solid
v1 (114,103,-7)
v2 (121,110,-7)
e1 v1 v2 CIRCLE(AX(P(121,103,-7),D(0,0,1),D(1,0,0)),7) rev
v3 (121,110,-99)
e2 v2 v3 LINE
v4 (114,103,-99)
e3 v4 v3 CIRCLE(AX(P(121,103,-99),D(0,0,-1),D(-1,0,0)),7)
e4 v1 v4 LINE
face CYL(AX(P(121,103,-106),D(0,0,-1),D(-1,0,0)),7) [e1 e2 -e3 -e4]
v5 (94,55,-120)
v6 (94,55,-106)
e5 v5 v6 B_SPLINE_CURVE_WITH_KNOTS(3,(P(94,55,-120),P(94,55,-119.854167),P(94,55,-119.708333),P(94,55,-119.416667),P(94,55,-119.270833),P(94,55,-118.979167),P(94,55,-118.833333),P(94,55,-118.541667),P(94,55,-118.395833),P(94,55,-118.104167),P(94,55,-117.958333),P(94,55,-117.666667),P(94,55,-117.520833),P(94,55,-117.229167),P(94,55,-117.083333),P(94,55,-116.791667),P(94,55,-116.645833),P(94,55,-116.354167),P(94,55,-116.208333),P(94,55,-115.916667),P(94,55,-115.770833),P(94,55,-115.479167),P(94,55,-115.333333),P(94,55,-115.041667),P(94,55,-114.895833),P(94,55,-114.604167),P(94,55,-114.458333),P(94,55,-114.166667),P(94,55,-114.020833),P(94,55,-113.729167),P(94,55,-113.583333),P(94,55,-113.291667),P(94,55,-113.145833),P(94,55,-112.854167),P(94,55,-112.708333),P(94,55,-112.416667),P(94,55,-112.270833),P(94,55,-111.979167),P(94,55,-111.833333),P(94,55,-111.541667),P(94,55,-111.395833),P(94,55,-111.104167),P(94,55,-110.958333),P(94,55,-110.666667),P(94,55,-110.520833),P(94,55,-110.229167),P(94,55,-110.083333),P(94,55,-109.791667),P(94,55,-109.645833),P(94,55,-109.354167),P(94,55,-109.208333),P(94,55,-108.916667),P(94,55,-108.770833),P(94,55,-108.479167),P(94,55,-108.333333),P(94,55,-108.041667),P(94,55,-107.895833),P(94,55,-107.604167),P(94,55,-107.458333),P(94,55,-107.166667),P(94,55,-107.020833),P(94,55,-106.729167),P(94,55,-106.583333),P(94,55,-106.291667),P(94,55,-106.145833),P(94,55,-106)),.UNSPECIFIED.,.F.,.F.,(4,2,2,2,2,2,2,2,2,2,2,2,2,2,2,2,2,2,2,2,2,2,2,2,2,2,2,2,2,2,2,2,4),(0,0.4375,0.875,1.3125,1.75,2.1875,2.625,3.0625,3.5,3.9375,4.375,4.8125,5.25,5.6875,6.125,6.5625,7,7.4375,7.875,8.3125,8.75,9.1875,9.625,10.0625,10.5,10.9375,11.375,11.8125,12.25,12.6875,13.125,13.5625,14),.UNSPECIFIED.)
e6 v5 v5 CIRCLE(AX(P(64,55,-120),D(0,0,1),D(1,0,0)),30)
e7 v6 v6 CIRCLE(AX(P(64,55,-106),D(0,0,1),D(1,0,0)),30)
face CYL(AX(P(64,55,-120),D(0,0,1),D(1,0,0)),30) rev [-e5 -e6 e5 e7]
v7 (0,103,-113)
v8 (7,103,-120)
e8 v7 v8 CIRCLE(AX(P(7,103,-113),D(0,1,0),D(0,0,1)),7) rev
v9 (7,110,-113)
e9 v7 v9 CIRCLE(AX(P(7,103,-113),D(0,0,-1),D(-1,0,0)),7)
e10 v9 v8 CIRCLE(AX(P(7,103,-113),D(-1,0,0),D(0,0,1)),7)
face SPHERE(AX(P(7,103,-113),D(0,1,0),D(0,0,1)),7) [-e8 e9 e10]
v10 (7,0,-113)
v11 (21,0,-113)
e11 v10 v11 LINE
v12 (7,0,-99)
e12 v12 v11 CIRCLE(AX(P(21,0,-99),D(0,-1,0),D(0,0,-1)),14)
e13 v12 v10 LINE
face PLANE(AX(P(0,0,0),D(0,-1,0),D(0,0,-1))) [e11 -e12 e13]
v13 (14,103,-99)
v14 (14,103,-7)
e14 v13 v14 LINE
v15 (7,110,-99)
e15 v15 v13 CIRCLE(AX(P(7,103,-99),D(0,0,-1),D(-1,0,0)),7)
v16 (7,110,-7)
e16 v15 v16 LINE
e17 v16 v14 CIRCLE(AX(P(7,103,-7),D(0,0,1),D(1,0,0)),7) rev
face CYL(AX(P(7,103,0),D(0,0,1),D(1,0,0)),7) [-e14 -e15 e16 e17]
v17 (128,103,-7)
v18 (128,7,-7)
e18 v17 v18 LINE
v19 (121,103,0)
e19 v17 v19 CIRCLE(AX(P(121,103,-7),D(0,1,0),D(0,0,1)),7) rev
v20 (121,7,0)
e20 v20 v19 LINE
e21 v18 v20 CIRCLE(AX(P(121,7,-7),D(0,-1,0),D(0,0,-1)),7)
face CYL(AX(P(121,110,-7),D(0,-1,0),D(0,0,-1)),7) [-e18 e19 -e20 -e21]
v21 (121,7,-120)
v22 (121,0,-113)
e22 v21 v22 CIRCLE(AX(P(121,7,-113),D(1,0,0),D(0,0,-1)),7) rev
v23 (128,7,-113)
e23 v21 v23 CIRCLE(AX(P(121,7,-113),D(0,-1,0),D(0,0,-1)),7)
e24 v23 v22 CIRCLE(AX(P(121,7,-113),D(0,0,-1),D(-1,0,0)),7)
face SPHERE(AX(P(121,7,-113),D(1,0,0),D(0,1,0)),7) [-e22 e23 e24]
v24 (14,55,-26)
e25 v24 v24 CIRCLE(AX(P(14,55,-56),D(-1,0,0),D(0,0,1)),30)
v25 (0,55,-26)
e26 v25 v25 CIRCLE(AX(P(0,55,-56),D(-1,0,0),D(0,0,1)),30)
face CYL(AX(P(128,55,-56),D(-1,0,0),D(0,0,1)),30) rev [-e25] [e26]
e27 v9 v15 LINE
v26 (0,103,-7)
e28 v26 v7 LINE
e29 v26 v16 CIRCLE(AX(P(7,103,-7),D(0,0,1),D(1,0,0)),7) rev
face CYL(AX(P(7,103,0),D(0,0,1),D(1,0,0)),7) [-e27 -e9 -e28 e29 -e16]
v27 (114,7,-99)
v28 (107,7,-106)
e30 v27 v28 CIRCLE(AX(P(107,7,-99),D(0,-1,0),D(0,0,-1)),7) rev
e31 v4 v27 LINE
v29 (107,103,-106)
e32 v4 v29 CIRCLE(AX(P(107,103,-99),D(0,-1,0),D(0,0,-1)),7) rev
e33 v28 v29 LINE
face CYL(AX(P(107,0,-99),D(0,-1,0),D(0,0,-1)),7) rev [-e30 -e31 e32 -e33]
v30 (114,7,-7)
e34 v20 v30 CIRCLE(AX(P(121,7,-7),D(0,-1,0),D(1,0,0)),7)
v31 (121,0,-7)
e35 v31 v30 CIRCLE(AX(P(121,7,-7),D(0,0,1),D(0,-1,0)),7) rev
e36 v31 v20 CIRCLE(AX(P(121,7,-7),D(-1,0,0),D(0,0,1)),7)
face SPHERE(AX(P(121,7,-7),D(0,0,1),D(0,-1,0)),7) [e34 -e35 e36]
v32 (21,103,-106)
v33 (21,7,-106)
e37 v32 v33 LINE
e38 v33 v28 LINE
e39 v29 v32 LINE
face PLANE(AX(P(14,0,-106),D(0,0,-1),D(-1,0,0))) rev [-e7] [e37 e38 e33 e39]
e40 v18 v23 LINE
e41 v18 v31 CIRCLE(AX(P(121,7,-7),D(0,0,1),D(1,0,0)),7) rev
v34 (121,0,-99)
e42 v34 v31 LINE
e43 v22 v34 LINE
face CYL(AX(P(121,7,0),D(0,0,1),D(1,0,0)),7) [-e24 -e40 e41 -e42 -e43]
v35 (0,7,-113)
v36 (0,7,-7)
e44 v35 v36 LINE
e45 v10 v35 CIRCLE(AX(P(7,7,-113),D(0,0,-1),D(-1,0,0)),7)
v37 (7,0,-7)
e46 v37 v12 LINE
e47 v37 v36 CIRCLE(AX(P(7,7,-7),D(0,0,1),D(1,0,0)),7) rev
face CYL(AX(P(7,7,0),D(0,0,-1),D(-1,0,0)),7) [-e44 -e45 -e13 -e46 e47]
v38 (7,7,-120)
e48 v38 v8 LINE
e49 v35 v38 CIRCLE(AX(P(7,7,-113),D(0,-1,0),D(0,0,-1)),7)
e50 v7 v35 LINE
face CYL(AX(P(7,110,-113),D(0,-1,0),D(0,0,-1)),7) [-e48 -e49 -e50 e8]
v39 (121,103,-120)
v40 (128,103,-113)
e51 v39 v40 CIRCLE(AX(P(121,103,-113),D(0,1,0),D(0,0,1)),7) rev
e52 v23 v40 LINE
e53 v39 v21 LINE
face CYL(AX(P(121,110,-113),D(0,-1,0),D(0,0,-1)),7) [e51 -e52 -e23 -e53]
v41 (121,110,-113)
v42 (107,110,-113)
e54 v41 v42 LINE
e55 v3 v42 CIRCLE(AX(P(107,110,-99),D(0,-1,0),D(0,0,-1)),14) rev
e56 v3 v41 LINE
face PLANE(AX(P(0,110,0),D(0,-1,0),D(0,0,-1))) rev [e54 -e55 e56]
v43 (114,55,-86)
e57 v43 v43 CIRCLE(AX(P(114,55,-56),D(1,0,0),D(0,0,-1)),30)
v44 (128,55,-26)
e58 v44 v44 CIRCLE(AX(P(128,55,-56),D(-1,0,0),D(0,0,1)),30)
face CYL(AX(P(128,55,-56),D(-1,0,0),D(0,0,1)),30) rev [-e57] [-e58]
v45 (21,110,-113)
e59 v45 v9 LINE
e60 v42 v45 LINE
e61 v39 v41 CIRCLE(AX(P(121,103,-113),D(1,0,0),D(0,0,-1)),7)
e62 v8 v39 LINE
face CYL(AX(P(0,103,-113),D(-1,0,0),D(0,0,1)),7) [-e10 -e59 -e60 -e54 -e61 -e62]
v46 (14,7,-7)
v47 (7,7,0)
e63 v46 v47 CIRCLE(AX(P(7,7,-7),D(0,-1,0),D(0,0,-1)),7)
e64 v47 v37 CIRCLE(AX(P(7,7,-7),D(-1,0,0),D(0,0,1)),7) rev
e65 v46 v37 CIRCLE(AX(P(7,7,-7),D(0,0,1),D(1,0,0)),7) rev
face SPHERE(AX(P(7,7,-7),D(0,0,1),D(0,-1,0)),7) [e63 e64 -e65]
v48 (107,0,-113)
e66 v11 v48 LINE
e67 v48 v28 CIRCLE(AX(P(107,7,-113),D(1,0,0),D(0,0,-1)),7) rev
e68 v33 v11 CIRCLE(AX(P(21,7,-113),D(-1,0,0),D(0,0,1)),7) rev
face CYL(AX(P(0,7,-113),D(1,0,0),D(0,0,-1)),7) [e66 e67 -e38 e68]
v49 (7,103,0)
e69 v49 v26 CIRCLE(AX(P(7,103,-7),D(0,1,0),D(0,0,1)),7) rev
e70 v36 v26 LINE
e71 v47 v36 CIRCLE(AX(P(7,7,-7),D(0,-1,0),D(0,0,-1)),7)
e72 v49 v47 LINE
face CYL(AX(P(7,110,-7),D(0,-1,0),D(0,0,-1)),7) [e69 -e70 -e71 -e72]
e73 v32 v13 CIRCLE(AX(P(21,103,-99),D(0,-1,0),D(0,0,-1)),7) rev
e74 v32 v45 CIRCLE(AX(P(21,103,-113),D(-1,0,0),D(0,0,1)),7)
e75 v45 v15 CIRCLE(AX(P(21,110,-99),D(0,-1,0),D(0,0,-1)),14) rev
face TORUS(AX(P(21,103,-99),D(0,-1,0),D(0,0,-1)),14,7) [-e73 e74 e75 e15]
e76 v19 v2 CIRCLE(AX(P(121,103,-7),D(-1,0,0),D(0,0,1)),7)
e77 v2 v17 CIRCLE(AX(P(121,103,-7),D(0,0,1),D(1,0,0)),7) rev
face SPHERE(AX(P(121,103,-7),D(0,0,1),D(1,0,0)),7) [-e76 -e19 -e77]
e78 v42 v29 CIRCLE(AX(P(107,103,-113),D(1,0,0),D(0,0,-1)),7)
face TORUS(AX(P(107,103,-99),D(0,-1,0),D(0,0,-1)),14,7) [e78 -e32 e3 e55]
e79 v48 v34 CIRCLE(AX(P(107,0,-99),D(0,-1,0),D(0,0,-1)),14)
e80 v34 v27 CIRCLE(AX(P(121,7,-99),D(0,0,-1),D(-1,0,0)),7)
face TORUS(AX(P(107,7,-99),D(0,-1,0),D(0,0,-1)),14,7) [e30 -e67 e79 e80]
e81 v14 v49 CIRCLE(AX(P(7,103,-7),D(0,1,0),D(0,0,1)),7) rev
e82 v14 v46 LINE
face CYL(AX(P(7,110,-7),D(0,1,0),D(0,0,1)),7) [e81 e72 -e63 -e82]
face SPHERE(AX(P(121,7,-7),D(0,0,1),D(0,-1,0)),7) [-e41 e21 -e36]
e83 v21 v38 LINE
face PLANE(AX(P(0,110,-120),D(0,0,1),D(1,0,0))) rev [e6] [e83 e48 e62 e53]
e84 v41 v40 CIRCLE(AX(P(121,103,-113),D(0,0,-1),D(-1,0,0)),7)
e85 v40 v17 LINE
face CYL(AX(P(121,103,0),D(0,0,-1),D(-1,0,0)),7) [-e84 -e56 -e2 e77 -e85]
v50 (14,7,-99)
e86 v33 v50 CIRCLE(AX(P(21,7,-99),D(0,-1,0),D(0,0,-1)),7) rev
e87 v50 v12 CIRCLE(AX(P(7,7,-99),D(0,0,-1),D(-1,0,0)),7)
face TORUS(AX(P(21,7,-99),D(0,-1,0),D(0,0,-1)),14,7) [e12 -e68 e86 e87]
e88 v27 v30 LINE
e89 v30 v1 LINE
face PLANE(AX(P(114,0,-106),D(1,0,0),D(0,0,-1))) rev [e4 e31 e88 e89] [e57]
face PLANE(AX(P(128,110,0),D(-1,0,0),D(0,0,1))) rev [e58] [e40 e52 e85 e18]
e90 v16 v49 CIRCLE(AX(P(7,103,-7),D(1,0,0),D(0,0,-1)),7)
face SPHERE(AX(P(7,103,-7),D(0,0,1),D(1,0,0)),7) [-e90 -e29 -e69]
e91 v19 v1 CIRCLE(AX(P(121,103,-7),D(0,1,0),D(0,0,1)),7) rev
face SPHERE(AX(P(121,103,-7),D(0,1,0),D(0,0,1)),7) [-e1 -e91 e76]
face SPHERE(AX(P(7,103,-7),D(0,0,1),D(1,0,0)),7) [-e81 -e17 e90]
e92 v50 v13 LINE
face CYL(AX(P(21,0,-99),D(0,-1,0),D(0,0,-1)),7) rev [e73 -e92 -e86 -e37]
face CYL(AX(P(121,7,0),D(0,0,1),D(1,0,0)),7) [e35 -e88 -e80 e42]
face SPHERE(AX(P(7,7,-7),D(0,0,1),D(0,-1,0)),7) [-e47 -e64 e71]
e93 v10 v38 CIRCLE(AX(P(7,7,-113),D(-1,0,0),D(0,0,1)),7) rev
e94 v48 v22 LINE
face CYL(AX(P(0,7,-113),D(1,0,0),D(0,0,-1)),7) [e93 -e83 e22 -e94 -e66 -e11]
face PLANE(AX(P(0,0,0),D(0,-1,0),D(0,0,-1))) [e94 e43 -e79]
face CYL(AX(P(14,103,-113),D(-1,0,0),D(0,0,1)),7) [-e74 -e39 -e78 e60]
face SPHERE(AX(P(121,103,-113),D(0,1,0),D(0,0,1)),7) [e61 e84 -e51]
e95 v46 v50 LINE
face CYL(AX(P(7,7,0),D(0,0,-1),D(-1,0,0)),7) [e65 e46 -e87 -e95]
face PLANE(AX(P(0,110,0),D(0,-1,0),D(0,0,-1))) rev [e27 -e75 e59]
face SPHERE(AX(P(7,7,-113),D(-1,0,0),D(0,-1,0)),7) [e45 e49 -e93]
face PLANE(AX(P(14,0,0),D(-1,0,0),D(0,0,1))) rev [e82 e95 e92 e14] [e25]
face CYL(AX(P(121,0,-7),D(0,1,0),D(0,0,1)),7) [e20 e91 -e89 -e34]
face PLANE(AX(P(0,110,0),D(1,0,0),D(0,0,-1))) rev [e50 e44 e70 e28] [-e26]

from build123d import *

# Parameters (mm, degrees)
SKETCH1_W           = 128
SKETCH1_H           = 120
BOSS_EXTRUDE1_DEPTH = 110
SKETCH2_W           = 100
SKETCH2_H           = 106
CUT_EXTRUDE2_DEPTH  = 208.084523806
SKETCH3_R           = 30
CUT_EXTRUDE3_DEPTH  = 208.084523806
SKETCH4_R           = 30
CUT_EXTRUDE4_DEPTH  = 200.298770694
FILLET1_R           = 7


with BuildPart() as part:
    # Sketch1 → Boss-Extrude1 (new body)
    with BuildSketch(Plane(origin=(0, 0, 0), x_dir=(1, 0, 0), z_dir=(0, 1, 0))):
        with Locations((64, 60)):
            Rectangle(SKETCH1_W, SKETCH1_H)
    extrude(amount=BOSS_EXTRUDE1_DEPTH)

    # Sketch2 → Cut-Extrude2 (cut, through all)
    with BuildSketch(Plane(origin=(0, 110, 0), x_dir=(1, 0, 0), z_dir=(0, 1, 0))):
        with Locations((64, 53)):
            Rectangle(SKETCH2_W, SKETCH2_H)
    extrude(amount=-CUT_EXTRUDE2_DEPTH, mode=Mode.SUBTRACT)

    # Sketch3 → Cut-Extrude3 (cut, through all)
    with BuildSketch(Plane.ZY):
        with Locations((-56, 55)):
            Circle(SKETCH3_R)
    extrude(amount=-CUT_EXTRUDE3_DEPTH, mode=Mode.SUBTRACT)

    # Sketch4 → Cut-Extrude4 (cut, through all)
    with BuildSketch(Plane.XY.offset(-106)):
        with Locations((64, 55)):
            Circle(SKETCH4_R)
    extrude(amount=-CUT_EXTRUDE4_DEPTH, mode=Mode.SUBTRACT)

    # Fillet1
    fillet1_edges = [part.edges().sort_by_distance(p)[0] for p in [
        (128, 110, -60),
        (121, 0, 0),
        (64, 110, -120),
        (121, 110, 0),
        (114, 55, 0),
        (14, 0, -53),
        (14, 55, 0),
        (64, 0, -106),
        (14, 55, -106),
        (114, 0, -53),
        (114, 55, -106),
        (114, 110, -53),
        (64, 110, -106),
        (14, 110, -53),
        (0, 110, -60),
        (64, 0, -120),
        (128, 0, -60),
        (7, 0, 0),
        (0, 0, -60),
        (0, 55, -120),
        (128, 55, -120),
        (128, 55, 0),
        (0, 55, 0),
        (7, 110, 0),
    ]]
    fillet(fillet1_edges, radius=FILLET1_R - 0.0001)  # a hair under: the kernel refuses the full size


solid = part.part
